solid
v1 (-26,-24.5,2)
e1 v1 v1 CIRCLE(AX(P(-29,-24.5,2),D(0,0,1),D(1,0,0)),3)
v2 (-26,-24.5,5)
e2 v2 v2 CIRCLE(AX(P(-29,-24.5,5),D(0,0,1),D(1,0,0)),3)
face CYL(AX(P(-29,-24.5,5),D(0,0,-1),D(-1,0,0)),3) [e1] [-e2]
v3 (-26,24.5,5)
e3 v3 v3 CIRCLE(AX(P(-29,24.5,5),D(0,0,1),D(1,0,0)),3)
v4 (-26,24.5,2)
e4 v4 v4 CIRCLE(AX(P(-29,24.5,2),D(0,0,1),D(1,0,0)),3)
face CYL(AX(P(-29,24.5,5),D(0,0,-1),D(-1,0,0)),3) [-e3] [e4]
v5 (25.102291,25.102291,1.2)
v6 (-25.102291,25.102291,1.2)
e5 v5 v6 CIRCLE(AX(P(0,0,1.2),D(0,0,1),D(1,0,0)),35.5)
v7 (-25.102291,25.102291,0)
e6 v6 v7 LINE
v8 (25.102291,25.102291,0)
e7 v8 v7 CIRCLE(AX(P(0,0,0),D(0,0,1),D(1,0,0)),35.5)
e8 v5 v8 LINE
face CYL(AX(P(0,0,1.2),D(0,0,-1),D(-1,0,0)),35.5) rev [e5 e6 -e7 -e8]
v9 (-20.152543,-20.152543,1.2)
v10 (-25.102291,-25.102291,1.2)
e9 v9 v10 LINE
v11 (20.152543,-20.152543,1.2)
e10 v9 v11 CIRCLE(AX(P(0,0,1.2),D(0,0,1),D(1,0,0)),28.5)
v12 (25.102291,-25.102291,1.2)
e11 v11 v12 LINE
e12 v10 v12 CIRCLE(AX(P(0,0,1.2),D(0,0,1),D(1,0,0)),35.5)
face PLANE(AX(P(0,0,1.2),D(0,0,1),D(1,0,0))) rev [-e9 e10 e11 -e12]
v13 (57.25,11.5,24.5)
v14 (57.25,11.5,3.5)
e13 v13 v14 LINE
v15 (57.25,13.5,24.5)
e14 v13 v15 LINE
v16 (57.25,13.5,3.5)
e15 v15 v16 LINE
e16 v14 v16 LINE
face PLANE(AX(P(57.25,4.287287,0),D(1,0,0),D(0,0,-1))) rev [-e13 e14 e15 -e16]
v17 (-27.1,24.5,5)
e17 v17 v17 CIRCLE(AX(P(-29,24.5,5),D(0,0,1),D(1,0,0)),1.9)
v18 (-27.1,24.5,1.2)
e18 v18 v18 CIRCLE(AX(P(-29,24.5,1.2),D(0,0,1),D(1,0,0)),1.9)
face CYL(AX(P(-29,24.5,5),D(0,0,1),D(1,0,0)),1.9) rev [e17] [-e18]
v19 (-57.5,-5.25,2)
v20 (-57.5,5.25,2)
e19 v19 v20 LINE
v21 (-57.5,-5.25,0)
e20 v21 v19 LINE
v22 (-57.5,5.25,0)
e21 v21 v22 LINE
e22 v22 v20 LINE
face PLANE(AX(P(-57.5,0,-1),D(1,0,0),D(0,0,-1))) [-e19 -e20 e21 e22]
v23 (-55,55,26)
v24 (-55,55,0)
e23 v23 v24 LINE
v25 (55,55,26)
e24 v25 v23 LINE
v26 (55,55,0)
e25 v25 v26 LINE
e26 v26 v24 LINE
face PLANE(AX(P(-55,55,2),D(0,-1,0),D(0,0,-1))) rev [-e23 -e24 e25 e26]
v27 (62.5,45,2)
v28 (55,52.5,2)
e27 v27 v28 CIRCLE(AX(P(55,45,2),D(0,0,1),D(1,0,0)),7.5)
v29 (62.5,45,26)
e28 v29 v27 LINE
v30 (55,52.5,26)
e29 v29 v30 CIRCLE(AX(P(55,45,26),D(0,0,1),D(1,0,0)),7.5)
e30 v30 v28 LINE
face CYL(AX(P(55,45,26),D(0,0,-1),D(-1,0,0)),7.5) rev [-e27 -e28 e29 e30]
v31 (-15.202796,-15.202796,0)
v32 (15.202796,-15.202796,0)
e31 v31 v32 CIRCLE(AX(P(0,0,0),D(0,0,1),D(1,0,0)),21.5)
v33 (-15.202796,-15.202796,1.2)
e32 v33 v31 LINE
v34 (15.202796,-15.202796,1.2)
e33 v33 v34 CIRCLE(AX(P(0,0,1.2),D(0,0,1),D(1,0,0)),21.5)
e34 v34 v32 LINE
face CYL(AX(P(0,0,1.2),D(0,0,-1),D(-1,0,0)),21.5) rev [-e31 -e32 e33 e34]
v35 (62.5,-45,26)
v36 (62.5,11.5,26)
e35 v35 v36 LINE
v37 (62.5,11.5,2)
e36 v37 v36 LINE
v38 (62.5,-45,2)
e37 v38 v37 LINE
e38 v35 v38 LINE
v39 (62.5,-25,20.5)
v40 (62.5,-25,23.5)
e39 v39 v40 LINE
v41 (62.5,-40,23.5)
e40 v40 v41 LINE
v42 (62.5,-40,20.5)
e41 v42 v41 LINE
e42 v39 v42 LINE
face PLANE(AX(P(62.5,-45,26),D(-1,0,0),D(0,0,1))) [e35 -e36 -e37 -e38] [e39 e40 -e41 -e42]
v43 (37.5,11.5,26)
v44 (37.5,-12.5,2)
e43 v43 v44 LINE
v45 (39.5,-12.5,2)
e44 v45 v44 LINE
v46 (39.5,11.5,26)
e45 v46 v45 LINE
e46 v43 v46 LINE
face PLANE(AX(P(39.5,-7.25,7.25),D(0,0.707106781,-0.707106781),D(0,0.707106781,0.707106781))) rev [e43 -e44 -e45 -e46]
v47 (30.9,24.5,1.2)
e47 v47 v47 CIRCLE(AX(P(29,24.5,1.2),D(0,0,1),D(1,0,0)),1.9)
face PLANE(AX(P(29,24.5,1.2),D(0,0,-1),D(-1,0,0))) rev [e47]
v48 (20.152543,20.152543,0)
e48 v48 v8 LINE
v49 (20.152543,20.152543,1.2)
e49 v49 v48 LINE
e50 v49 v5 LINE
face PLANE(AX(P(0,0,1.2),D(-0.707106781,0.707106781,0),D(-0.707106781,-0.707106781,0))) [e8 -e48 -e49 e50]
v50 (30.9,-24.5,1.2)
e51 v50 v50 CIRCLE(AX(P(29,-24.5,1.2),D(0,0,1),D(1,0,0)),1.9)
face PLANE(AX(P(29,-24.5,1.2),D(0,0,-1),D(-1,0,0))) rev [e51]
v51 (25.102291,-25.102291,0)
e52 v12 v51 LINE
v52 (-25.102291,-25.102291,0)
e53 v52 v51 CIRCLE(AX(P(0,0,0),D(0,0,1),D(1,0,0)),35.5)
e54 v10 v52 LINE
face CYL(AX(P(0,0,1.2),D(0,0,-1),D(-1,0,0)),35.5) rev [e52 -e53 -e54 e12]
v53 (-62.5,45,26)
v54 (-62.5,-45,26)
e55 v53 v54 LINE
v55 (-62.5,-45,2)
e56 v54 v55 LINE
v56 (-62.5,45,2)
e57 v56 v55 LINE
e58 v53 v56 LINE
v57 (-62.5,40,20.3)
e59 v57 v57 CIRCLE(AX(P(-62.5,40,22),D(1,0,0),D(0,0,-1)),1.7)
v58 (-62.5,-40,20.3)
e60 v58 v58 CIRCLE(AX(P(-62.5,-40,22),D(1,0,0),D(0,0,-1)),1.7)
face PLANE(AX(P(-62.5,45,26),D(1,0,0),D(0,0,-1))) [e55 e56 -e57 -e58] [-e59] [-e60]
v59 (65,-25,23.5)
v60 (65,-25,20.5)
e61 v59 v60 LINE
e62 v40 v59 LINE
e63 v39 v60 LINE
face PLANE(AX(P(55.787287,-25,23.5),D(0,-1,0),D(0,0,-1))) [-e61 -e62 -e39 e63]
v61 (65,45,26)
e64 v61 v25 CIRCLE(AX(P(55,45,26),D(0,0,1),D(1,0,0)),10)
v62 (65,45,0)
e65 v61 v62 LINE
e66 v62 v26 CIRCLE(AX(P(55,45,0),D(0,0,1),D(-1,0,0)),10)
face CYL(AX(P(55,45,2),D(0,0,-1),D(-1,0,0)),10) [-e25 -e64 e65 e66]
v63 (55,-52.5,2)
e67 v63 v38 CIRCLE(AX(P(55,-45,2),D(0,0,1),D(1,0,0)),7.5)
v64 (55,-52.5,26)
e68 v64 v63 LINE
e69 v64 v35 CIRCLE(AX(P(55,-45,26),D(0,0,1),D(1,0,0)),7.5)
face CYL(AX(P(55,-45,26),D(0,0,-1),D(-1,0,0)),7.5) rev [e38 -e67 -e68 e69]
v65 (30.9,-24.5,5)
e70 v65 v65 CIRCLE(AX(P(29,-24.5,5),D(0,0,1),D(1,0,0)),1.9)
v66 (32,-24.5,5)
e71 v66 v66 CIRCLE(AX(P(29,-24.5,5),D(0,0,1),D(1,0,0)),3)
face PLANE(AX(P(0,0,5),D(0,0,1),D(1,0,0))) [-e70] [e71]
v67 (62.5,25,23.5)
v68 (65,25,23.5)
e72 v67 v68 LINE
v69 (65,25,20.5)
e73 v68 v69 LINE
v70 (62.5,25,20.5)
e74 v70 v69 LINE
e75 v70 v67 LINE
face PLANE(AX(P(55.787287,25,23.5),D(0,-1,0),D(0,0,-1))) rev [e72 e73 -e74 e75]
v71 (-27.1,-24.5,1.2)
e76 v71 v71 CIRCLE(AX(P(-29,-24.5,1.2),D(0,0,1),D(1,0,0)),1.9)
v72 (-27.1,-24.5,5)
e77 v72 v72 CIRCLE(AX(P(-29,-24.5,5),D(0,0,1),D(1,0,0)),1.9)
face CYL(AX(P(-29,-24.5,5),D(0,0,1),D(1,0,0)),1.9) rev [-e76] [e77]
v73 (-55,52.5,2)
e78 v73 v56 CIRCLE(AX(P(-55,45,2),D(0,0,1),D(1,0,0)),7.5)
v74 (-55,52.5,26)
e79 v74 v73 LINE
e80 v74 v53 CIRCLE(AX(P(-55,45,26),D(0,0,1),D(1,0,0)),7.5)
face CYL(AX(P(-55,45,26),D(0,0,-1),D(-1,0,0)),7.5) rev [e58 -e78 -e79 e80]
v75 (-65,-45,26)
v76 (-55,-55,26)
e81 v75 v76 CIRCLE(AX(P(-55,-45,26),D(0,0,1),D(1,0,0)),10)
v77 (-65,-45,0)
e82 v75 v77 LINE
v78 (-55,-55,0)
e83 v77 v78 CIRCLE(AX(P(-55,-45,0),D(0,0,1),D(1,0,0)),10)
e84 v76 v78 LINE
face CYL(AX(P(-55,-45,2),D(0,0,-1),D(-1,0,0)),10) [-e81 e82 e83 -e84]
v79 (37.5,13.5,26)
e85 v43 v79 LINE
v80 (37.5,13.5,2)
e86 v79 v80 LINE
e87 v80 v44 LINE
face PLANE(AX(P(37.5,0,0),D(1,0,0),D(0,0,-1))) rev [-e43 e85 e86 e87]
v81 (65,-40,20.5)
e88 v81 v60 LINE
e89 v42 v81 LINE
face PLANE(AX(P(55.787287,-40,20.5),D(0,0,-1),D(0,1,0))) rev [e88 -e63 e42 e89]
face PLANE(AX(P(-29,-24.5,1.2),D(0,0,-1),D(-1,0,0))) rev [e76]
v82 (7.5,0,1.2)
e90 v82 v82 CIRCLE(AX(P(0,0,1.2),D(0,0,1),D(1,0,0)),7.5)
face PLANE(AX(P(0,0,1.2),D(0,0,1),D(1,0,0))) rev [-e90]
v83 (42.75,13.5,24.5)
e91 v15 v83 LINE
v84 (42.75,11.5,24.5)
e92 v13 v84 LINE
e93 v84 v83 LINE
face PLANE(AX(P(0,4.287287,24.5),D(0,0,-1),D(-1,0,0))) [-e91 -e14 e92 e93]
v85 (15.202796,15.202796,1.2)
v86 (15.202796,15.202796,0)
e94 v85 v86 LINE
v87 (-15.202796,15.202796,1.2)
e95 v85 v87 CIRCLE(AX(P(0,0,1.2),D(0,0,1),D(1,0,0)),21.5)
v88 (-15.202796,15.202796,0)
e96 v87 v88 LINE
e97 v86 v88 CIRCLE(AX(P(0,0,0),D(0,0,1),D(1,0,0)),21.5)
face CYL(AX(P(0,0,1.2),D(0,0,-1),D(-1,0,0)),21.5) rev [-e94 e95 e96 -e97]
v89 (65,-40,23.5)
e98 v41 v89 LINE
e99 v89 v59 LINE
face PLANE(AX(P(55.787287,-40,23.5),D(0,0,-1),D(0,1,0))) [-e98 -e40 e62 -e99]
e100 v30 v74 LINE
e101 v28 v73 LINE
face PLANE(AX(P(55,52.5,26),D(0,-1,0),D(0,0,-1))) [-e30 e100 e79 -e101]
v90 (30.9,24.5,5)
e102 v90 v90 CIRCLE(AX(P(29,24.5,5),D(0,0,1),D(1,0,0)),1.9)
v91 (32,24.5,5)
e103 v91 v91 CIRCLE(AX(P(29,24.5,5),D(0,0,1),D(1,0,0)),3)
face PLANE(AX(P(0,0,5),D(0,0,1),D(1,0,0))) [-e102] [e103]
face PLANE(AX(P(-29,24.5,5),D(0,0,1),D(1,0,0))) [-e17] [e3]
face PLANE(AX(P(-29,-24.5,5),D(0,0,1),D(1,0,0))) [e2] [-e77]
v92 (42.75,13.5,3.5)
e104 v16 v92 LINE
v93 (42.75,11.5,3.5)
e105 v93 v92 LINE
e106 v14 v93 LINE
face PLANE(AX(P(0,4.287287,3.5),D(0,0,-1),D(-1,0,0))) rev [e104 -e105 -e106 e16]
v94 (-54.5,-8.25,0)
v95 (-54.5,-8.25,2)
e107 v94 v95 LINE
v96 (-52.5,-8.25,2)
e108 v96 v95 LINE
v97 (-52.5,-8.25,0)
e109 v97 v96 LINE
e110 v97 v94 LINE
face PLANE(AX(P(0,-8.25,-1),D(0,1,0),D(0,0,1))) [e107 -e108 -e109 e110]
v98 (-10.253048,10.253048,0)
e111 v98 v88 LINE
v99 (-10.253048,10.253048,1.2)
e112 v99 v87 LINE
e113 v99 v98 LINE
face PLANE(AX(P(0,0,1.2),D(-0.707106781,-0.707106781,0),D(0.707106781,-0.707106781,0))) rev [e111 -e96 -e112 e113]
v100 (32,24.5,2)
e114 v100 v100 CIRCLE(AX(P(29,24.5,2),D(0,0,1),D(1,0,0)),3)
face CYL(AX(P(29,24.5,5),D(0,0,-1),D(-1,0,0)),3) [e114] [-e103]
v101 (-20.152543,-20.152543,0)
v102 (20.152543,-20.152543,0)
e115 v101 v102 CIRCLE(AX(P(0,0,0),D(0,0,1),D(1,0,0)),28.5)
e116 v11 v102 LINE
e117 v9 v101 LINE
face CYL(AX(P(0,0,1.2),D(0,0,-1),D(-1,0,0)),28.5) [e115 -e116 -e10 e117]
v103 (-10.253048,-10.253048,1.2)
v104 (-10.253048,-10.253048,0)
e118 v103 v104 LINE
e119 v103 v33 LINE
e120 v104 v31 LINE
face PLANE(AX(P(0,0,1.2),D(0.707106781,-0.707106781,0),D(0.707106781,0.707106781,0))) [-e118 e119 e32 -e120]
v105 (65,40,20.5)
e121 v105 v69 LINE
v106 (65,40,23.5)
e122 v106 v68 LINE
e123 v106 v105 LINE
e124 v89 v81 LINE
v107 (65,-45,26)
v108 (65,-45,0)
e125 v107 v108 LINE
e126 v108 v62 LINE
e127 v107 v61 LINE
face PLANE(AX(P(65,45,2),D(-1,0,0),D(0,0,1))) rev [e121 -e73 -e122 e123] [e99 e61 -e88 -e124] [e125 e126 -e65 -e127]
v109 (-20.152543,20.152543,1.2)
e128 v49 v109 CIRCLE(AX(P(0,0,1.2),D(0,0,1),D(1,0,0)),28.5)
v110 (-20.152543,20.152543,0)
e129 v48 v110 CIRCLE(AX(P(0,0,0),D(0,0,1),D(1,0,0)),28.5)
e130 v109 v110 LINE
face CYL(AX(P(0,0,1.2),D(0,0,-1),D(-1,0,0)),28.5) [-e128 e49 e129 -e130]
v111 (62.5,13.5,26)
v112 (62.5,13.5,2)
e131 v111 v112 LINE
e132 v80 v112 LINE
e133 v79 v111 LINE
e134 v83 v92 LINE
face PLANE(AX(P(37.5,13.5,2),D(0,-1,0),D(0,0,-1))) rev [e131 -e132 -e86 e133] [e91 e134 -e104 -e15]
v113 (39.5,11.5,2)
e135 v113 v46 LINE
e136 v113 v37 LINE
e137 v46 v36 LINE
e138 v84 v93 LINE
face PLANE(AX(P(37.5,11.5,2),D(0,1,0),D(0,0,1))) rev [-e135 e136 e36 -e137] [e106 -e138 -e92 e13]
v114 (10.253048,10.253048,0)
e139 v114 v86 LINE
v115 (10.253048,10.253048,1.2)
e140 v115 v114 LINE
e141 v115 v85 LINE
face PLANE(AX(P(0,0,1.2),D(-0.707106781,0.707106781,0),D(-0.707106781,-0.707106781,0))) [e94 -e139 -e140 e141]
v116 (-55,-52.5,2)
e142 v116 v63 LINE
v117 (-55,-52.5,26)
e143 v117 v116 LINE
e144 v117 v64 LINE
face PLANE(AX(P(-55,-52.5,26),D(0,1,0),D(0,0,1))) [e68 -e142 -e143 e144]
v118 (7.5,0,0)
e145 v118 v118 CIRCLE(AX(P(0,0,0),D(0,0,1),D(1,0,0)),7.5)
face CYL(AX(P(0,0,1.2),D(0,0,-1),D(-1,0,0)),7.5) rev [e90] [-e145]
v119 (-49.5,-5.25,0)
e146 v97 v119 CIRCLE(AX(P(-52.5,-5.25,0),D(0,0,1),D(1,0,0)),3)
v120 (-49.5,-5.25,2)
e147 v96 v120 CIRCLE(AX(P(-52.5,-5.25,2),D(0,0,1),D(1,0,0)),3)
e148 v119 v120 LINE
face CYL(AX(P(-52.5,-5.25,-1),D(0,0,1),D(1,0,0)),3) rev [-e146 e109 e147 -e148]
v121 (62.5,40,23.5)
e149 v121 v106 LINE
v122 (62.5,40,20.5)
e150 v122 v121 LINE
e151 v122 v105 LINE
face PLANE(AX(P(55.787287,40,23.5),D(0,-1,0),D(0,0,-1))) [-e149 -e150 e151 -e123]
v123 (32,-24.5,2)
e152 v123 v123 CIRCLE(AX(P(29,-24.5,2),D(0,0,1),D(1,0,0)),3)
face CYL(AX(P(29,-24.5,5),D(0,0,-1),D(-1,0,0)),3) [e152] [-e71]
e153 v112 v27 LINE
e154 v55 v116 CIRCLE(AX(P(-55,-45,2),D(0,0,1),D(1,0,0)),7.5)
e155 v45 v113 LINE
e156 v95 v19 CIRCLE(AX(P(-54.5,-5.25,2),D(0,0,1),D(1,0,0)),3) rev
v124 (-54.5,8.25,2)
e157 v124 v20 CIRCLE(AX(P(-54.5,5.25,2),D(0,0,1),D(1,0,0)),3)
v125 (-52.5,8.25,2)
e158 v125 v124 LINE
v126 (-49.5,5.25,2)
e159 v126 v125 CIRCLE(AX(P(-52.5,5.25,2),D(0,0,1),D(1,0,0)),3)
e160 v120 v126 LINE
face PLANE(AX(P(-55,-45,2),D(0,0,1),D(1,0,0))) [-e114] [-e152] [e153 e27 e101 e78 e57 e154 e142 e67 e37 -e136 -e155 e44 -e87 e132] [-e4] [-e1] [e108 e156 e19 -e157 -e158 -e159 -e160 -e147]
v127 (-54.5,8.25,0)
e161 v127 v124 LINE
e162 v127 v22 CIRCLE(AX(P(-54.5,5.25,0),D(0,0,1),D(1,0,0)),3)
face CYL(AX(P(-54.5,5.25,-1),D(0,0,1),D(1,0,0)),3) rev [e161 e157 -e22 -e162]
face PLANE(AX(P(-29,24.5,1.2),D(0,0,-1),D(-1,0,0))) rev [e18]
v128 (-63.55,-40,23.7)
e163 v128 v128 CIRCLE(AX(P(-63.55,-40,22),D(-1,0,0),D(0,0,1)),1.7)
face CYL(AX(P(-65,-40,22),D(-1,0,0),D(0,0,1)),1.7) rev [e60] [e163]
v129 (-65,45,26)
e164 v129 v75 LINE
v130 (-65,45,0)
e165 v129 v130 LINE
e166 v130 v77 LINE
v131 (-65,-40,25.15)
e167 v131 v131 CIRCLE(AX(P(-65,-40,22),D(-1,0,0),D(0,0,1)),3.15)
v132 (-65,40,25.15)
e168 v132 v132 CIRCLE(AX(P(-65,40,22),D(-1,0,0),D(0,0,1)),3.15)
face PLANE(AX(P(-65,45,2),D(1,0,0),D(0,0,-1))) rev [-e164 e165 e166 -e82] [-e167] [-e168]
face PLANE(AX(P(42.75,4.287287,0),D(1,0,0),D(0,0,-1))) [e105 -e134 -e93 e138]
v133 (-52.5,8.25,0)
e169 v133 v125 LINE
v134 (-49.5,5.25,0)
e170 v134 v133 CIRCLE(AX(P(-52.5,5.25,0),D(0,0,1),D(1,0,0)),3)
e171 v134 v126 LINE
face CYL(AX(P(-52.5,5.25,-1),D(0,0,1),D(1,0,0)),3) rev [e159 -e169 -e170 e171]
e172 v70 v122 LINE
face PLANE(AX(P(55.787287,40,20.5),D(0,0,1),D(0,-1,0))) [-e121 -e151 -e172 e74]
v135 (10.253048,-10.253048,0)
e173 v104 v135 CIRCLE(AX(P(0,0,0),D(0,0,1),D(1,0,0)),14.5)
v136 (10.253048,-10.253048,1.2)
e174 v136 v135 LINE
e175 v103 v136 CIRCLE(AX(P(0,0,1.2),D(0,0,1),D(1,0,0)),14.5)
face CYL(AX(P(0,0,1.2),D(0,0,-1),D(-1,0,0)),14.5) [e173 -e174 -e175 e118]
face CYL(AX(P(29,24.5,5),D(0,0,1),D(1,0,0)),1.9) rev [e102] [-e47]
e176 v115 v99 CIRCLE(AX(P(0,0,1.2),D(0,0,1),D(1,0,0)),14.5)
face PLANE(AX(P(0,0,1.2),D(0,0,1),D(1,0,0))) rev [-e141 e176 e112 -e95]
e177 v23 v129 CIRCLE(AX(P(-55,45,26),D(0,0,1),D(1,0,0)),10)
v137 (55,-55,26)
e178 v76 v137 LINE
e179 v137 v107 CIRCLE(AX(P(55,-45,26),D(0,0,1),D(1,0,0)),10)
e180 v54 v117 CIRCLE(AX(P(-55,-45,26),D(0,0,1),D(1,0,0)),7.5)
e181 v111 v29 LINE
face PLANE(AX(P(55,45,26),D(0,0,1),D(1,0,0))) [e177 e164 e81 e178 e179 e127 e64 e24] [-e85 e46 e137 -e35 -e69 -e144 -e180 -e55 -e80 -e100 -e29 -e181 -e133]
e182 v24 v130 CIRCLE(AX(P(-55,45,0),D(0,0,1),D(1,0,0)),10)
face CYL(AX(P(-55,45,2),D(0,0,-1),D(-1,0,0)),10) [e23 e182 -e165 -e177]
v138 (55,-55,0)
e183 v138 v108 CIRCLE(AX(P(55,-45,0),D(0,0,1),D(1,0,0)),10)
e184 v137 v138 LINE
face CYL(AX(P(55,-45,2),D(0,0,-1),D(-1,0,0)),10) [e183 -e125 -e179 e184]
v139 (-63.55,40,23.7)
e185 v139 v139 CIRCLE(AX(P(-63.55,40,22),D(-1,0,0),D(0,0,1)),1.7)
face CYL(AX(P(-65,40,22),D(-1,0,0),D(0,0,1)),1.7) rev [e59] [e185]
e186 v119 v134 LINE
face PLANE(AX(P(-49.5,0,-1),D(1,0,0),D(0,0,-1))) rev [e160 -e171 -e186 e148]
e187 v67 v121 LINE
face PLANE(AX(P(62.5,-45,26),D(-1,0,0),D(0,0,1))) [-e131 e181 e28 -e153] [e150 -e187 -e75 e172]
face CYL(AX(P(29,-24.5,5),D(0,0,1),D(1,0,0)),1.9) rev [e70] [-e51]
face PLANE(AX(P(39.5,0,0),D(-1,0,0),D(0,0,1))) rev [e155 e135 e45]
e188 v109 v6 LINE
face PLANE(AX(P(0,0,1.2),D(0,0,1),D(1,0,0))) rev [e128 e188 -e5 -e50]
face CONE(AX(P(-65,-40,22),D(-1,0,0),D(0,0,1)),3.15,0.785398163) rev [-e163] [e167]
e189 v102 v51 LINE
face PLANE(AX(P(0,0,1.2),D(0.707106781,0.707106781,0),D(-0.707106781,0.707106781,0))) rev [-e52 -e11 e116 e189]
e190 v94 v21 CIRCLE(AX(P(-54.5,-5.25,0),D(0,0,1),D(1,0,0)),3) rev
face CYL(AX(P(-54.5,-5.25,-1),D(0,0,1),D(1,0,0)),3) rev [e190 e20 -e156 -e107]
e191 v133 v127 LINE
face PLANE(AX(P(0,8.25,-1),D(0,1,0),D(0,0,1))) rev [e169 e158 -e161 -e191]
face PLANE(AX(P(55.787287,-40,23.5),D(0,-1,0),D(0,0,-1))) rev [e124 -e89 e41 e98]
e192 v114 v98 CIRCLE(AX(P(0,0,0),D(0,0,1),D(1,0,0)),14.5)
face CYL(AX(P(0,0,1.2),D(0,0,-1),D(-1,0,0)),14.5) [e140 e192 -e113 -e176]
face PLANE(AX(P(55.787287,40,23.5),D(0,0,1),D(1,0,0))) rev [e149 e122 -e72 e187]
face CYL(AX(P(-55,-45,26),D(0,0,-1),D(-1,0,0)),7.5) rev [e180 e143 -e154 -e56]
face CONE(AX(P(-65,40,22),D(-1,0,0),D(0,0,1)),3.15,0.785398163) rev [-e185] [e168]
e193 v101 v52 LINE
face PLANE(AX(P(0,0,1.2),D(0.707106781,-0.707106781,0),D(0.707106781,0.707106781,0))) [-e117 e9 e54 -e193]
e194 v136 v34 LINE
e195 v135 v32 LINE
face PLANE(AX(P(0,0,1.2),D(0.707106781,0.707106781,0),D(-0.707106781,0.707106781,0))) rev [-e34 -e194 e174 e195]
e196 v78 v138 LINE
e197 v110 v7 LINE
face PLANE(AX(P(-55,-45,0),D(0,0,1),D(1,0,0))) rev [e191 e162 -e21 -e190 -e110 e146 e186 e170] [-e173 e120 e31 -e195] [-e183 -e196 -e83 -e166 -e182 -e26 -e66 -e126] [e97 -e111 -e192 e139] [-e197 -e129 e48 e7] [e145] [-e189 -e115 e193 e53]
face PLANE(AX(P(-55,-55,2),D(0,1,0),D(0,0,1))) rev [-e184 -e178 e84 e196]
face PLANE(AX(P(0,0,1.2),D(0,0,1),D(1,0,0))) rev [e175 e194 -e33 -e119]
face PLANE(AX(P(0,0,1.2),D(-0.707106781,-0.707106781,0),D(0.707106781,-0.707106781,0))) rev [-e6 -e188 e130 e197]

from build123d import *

# Parameters (mm, degrees)
P_IDAT_VYSUNUT_M1_DEPTH                           = 2
P_IDAT_VYSUNUT_M2_DEPTH                           = 24
SKICA6_R                                          = 3
P_IDAT_VYSUNUT_M3_DEPTH                           = 3
D_RY_PRO_KOL_K_VELIKOST_MM1_D                     = 3.8
D_RY_PRO_KOL_K_VELIKOST_MM1_DEPTH                 = 3.8
ODEBRAT_VYSUNUT_M1_DEPTH                          = 3
SKICA12_W                                         = 24
SKICA12_H                                         = 2
P_IDAT_VYSUNUT_M4_DEPTH                           = 25
P_IDAT_VYSUNUT_M5_DEPTH                           = 2
SKICA14_W                                         = 7.25
SKICA14_H                                         = 10.5
ODEBRAT_VYSUNUT_M2_DEPTH                          = 9.212713479
V_LCOV_ZAHLOUBEN_PRO_M3_ROUBY_S_PLOCH_D           = 3.4
V_LCOV_ZAHLOUBEN_PRO_M3_ROUBY_S_PLOCH_DEPTH       = 3.8
V_LCOV_ZAHLOUBEN_PRO_M3_ROUBY_S_PLOCH_CSINK_D     = 6.3
V_LCOV_ZAHLOUBEN_PRO_M3_ROUBY_S_PLOCH_CSINK_ANGLE = 90
V_LCOV_ZAHLOUBEN_PRO_M3_ROUBY_S_PLOCH_TIP         = 1.021463052
SKICA17_W                                         = 3
SKICA17_H                                         = 15
ODEBRAT_VYSUNUT_M3_DEPTH                          = 9.212713479
DUTINA1_OUTLINE_R                                 = 7.5
DUTINA1_DEPTH                                     = 1.2


# Read off the part's stored shape, not the designer's step: Dutina1
with BuildPart() as part:
    # Skica1 → Přidat vysunutím1 (new body)
    with BuildSketch(Plane.XY):
        with BuildLine():
            Line((-55, 55), (55, 55))
            ThreePointArc((55, 55), (62.071067812, 52.071067812), (65, 45))
            Line((65, 45), (65, -45))
            ThreePointArc((65, -45), (62.071067812, -52.071067812), (55, -55))
            Line((55, -55), (-55, -55))
            ThreePointArc((-55, -55), (-62.071067812, -52.071067812), (-65, -45))
            Line((-65, -45), (-65, 45))
            ThreePointArc((-65, 45), (-62.071067812, 52.071067812), (-55, 55))
        make_face()
    extrude(amount=P_IDAT_VYSUNUT_M1_DEPTH)

    # Skica2 → Přidat vysunutím2 (add)
    with BuildSketch(Plane.XY.offset(2)):
        with BuildLine():
            Line((55, 55), (-55, 55))
            ThreePointArc((-55, 55), (-62.071067812, 52.071067812), (-65, 45))
            Line((-65, 45), (-65, -45))
            ThreePointArc((-65, -45), (-62.071067812, -52.071067812), (-55, -55))
            Line((-55, -55), (55, -55))
            ThreePointArc((55, -55), (62.071067812, -52.071067812), (65, -45))
            Line((65, -45), (65, 45))
            ThreePointArc((65, 45), (62.071067812, 52.071067812), (55, 55))
        make_face()
        with BuildLine():
            Line((-55, -52.5), (55, -52.5))
            ThreePointArc((55, -52.5), (60.303300859, -50.303300859), (62.5, -45))
            Line((62.5, -45), (62.5, 45))
            ThreePointArc((62.5, 45), (60.303300859, 50.303300859), (55, 52.5))
            Line((55, 52.5), (-55, 52.5))
            ThreePointArc((-55, 52.5), (-60.303300859, 50.303300859), (-62.5, 45))
            Line((-62.5, 45), (-62.5, -45))
            ThreePointArc((-62.5, -45), (-60.303300859, -50.303300859), (-55, -52.5))
        make_face(mode=Mode.SUBTRACT)
    extrude(amount=P_IDAT_VYSUNUT_M2_DEPTH)

    # Skica6 → Přidat vysunutím3 (add)
    with BuildSketch(Plane.XY.offset(2)):
        with BuildLine():
            ThreePointArc((29, -21.5), (26.878679656, -22.378679656), (26, -24.5))
            Line((26, -24.5), (29, -24.5))
            Line((29, -24.5), (29, -21.5))
        make_face()
        with BuildLine():
            Line((29, -24.5), (26, -24.5))
            ThreePointArc((26, -24.5), (29, -27.5), (32, -24.5))
            ThreePointArc((32, -24.5), (31.121320344, -22.378679656), (29, -21.5))
            Line((29, -21.5), (29, -24.5))
        make_face()
        with BuildLine():
            ThreePointArc((26, 24.5), (26.878679656, 22.378679656), (29, 21.5))
            Line((29, 21.5), (29, 24.5))
            Line((29, 24.5), (26, 24.5))
        make_face()
        with BuildLine():
            Line((29, 24.5), (29, 21.5))
            ThreePointArc((29, 21.5), (31.121320344, 22.378679656), (32, 24.5))
            ThreePointArc((32, 24.5), (29, 27.5), (26, 24.5))
            Line((26, 24.5), (29, 24.5))
        make_face()
        with Locations((-29, 24.5)):
            Circle(SKICA6_R)
        with Locations((-29, -24.5)):
            Circle(SKICA6_R)
    extrude(amount=P_IDAT_VYSUNUT_M3_DEPTH)

    # Díry pro kolík, velikost mm1
    with Locations(Plane.XY.offset(5)):
        with Locations((29, 24.5), (29, -24.5), (-29, -24.5), (-29, 24.5)):
            Hole(D_RY_PRO_KOL_K_VELIKOST_MM1_D / 2, depth=D_RY_PRO_KOL_K_VELIKOST_MM1_DEPTH)

    # Skica11 → Odebrat vysunutím1 (cut)
    with BuildSketch(Plane.XY.offset(2)):
        with BuildLine():
            Line((-49.5, 0), (-57.5, 0))
            Line((-57.5, 0), (-57.5, -5.25))
            ThreePointArc((-57.5, -5.25), (-56.621320344, -7.371320344), (-54.5, -8.25))
            Line((-54.5, -8.25), (-52.5, -8.25))
            ThreePointArc((-52.5, -8.25), (-50.378679656, -7.371320344), (-49.5, -5.25))
            Line((-49.5, -5.25), (-49.5, 0))
        make_face()
        with BuildLine():
            Line((-57.5, 5.25), (-57.5, 0))
            Line((-57.5, 0), (-49.5, 0))
            Line((-49.5, 0), (-49.5, 5.25))
            ThreePointArc((-49.5, 5.25), (-50.378679656, 7.371320344), (-52.5, 8.25))
            Line((-52.5, 8.25), (-54.5, 8.25))
            ThreePointArc((-54.5, 8.25), (-56.621320344, 7.371320344), (-57.5, 5.25))
        make_face()
    extrude(amount=-ODEBRAT_VYSUNUT_M1_DEPTH, mode=Mode.SUBTRACT)

    # Skica12 → Přidat vysunutím4 (add)
    with BuildSketch(Plane.ZY.offset(-62.5)):
        with Locations((14, 12.5)):
            Rectangle(SKICA12_W, SKICA12_H)
    extrude(amount=P_IDAT_VYSUNUT_M4_DEPTH)

    # Skica13 → Přidat vysunutím5 (add)
    with BuildSketch(Plane.ZY.offset(-37.5)):
        Polygon((2, -12.5), (2, 11.5), (26, 11.5), align=None)
    extrude(amount=-P_IDAT_VYSUNUT_M5_DEPTH)

    # Skica14 → Odebrat vysunutím2 (cut)
    with BuildSketch(Plane(origin=(0, 13.5, 0), x_dir=(1, 0, 0), z_dir=(0, 1, 0))):
        with Locations((46.375, -8.75)):
            Rectangle(SKICA14_W, SKICA14_H)
        with Locations((53.625, -8.75)):
            Rectangle(SKICA14_W, SKICA14_H)
        with Locations((53.625, -19.25)):
            Rectangle(SKICA14_W, SKICA14_H)
        with Locations((46.375, -19.25)):
            Rectangle(SKICA14_W, SKICA14_H)
    extrude(amount=-ODEBRAT_VYSUNUT_M2_DEPTH, mode=Mode.SUBTRACT)

    # Válcové zahloubení pro M3 šrouby s plochou hlavou1
    with Locations(Plane(origin=(-65, 40, 22), x_dir=(0, 0, -1), z_dir=(-1, 0, 0))):
        with Locations((0, 0), (0, 80)):
            CounterSinkHole(V_LCOV_ZAHLOUBEN_PRO_M3_ROUBY_S_PLOCH_D / 2, V_LCOV_ZAHLOUBEN_PRO_M3_ROUBY_S_PLOCH_CSINK_D / 2, depth=V_LCOV_ZAHLOUBEN_PRO_M3_ROUBY_S_PLOCH_DEPTH, counter_sink_angle=V_LCOV_ZAHLOUBEN_PRO_M3_ROUBY_S_PLOCH_CSINK_ANGLE)
            with Locations((0, 0, -(V_LCOV_ZAHLOUBEN_PRO_M3_ROUBY_S_PLOCH_DEPTH + V_LCOV_ZAHLOUBEN_PRO_M3_ROUBY_S_PLOCH_TIP / 2))):  # 118° drill point
                Cone(0, V_LCOV_ZAHLOUBEN_PRO_M3_ROUBY_S_PLOCH_D / 2, V_LCOV_ZAHLOUBEN_PRO_M3_ROUBY_S_PLOCH_TIP, mode=Mode.SUBTRACT)

    # Skica17 → Odebrat vysunutím3 (cut)
    with BuildSketch(Plane(origin=(65, 0, 0), x_dir=(0, 0, -1), z_dir=(1, 0, 0))):
        with Locations((-22, 32.5)):
            Rectangle(SKICA17_W, SKICA17_H)
        with Locations((-22, -32.5)):
            Rectangle(SKICA17_W, SKICA17_H)
    extrude(amount=-ODEBRAT_VYSUNUT_M3_DEPTH, mode=Mode.SUBTRACT)

    # Dutina1 outline → Dutina1 (cut)
    with BuildSketch(Plane.XY):
        Circle(DUTINA1_OUTLINE_R)
        with BuildLine():
            Line((10.253048327, 10.253048327), (15.202795796, 15.202795796))
            ThreePointArc((15.202795796, 15.202795796), (0, 21.5), (-15.202795796, 15.202795796))
            Line((-15.202795796, 15.202795796), (-10.253048327, 10.253048327))
            ThreePointArc((-10.253048327, 10.253048327), (0, 14.5), (10.253048327, 10.253048327))
        make_face()
        with BuildLine():
            Line((20.152543264, 20.152543264), (25.102290732, 25.102290732))
            ThreePointArc((25.102290732, 25.102290732), (0, 35.5), (-25.102290732, 25.102290732))
            Line((-25.102290732, 25.102290732), (-20.152543264, 20.152543264))
            ThreePointArc((-20.152543264, 20.152543264), (0, 28.5), (20.152543264, 20.152543264))
        make_face()
        with BuildLine():
            ThreePointArc((-15.202795796, -15.202795796), (0, -21.5), (15.202795796, -15.202795796))
            Line((15.202795796, -15.202795796), (10.253048327, -10.253048327))
            ThreePointArc((10.253048327, -10.253048327), (0, -14.5), (-10.253048327, -10.253048327))
            Line((-10.253048327, -10.253048327), (-15.202795796, -15.202795796))
        make_face()
        with BuildLine():
            Line((-20.152543264, -20.152543264), (-25.102290732, -25.102290732))
            ThreePointArc((-25.102290732, -25.102290732), (0, -35.5), (25.102290732, -25.102290732))
            Line((25.102290732, -25.102290732), (20.152543264, -20.152543264))
            ThreePointArc((20.152543264, -20.152543264), (0, -28.5), (-20.152543264, -20.152543264))
        make_face()
    extrude(amount=DUTINA1_DEPTH, mode=Mode.SUBTRACT)


solid = part.part
